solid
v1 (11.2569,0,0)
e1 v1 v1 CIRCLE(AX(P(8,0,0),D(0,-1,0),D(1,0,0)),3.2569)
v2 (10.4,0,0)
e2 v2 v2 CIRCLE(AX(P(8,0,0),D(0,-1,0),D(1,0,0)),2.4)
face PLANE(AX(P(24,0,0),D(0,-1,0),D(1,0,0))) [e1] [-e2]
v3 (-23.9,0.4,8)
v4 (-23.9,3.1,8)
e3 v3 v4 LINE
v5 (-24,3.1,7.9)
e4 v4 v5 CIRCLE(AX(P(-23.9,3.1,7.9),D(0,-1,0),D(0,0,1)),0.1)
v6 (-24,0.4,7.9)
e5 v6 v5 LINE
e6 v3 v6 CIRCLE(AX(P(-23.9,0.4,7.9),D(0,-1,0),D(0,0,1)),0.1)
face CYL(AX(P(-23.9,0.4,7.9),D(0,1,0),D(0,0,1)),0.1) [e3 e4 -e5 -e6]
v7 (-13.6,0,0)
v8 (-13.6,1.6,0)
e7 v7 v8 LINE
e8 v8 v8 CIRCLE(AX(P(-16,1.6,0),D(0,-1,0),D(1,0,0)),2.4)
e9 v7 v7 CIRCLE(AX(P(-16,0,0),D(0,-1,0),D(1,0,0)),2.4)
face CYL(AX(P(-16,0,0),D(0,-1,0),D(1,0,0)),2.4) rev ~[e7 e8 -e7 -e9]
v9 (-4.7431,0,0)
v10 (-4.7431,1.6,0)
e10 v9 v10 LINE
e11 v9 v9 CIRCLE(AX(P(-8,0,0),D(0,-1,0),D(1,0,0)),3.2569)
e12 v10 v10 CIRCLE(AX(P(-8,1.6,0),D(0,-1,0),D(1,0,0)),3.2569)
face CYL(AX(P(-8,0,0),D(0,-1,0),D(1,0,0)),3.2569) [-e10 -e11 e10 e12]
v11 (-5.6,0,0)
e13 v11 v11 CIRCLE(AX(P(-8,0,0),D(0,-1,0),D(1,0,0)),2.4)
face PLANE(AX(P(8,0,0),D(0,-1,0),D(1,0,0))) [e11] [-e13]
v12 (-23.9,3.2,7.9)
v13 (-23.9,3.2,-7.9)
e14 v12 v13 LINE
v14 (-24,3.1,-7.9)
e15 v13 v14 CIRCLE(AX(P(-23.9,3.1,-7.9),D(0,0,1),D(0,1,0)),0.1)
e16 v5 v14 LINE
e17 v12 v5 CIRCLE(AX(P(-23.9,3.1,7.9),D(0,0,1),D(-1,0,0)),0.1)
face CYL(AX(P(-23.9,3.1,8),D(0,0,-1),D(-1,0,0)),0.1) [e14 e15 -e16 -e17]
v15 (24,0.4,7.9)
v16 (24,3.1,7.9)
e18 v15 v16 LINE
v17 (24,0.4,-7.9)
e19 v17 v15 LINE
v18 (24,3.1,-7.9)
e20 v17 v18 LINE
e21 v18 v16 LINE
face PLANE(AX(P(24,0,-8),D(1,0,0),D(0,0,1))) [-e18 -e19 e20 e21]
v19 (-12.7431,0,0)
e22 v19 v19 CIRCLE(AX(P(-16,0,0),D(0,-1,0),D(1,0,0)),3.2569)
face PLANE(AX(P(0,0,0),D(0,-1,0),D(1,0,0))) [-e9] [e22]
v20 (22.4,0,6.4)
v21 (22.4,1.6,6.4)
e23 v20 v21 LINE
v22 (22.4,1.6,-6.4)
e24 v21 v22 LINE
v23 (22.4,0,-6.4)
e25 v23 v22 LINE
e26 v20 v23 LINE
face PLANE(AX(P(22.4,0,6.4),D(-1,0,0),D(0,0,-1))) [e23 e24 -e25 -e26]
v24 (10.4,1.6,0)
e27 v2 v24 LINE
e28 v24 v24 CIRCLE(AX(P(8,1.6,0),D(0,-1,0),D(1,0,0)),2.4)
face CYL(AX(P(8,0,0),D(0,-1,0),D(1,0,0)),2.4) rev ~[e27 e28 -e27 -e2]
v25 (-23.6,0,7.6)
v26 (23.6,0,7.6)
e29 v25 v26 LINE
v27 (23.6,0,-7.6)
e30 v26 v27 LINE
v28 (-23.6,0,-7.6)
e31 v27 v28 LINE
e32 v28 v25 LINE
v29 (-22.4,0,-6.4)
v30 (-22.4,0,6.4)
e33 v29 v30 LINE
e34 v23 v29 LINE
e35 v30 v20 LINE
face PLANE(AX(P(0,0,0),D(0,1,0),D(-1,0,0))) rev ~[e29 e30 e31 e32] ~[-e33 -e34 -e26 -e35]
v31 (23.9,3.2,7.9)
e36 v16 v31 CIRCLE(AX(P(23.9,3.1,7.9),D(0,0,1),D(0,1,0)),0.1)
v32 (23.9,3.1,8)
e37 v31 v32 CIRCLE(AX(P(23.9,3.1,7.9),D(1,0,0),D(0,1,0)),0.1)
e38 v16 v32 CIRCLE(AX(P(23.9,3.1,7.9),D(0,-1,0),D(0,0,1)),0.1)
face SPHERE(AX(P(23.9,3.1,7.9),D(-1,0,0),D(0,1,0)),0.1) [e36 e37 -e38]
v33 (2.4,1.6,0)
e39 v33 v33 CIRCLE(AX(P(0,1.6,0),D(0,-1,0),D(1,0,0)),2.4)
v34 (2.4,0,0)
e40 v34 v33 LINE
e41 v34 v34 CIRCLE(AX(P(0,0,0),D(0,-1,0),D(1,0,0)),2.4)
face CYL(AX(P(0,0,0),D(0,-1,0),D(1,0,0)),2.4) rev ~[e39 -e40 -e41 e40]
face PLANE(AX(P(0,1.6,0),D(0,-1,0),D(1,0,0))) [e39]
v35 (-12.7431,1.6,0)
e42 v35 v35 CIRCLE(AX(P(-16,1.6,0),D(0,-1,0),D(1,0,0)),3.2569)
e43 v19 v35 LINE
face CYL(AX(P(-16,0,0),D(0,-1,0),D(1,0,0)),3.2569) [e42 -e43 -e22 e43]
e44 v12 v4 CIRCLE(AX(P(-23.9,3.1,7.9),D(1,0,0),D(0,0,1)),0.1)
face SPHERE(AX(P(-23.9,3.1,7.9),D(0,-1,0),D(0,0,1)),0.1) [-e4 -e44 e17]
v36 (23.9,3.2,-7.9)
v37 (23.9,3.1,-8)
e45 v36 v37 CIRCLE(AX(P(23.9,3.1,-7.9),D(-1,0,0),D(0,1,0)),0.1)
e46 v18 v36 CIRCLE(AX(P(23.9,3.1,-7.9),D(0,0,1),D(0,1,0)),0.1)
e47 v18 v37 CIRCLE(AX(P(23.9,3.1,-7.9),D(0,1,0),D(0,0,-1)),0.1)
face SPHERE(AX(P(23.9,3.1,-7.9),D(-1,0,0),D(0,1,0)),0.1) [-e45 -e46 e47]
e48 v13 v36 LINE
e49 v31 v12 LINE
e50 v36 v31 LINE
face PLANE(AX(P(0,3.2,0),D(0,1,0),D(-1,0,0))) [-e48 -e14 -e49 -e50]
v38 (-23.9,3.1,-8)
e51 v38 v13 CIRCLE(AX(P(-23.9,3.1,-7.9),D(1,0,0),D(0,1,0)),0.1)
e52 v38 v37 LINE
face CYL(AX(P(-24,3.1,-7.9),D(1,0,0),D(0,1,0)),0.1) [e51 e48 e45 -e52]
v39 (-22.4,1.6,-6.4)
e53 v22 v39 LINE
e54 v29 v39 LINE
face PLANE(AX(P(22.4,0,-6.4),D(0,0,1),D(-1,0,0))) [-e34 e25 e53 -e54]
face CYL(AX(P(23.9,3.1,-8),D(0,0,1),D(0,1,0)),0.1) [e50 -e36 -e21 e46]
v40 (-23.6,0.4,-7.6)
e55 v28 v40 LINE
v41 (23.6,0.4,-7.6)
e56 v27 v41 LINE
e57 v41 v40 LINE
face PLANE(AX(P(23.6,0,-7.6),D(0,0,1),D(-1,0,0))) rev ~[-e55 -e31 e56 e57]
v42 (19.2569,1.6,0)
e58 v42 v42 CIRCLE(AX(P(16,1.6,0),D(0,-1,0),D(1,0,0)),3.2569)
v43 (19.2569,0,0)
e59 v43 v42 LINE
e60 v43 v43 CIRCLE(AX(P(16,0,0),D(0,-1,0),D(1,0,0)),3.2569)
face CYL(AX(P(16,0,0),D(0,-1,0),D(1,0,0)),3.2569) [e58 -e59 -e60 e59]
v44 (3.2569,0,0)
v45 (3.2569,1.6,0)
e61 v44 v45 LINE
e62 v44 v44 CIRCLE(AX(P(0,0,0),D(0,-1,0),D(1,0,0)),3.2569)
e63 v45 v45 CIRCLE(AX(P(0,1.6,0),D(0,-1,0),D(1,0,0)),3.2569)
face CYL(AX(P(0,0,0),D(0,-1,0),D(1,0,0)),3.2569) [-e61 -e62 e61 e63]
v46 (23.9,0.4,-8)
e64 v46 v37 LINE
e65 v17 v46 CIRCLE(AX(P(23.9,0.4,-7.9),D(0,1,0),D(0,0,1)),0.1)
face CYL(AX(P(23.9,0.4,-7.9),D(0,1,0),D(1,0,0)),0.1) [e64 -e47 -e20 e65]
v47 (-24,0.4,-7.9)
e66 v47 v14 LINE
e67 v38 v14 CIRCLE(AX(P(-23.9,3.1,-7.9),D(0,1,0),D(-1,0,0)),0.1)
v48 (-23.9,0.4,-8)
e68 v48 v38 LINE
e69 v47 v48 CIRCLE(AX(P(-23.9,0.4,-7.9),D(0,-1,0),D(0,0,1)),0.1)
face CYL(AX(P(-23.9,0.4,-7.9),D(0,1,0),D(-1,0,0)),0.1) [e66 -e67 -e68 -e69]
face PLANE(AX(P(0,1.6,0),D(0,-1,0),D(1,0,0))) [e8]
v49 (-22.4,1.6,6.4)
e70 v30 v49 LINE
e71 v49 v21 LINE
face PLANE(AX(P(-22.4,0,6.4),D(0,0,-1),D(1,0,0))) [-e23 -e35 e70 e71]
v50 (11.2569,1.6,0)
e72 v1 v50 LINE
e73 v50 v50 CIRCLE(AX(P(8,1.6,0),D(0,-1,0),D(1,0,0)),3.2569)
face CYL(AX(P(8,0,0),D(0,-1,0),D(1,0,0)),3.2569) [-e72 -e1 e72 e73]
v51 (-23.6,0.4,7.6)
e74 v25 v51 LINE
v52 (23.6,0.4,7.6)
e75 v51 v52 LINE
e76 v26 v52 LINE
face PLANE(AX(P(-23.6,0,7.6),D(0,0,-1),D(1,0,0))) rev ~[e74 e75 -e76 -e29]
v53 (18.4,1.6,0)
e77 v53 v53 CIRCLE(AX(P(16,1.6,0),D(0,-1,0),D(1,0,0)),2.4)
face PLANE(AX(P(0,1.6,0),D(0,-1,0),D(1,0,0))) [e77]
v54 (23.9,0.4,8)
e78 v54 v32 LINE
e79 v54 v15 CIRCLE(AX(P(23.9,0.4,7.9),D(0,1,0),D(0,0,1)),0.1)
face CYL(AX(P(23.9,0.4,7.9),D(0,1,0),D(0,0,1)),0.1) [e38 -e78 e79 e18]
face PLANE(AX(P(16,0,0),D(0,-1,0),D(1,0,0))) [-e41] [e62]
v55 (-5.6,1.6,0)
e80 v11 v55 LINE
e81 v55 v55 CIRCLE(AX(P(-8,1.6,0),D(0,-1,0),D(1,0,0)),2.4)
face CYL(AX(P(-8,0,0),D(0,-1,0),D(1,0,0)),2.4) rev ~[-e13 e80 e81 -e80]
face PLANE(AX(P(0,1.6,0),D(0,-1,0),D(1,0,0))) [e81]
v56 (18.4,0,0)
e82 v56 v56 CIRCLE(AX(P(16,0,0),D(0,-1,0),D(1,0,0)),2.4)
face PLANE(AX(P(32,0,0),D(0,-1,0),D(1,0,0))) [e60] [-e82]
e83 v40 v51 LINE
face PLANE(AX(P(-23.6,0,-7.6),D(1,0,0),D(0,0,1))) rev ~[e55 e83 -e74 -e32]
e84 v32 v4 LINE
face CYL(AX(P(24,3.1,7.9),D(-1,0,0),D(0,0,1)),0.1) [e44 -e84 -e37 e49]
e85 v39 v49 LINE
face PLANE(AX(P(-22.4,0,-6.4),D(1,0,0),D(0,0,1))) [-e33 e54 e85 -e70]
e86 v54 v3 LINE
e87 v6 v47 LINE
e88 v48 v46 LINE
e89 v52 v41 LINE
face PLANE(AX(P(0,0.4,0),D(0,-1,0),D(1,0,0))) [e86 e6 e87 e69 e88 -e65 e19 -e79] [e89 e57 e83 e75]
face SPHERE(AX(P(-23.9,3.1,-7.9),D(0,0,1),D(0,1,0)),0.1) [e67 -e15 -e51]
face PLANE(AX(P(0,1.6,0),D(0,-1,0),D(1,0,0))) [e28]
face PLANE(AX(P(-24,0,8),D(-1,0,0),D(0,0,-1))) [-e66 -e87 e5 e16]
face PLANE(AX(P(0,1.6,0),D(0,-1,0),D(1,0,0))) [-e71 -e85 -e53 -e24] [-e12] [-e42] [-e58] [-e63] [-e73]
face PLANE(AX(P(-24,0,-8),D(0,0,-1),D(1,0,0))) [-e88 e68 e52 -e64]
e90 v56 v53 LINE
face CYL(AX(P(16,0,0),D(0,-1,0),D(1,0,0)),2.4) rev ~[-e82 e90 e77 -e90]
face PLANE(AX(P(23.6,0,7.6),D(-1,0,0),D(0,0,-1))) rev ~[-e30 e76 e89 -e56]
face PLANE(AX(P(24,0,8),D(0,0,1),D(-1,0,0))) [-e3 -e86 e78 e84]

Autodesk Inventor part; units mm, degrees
ref_plane "YZ Plane" through (0, 0, 0) normal (1, 0, 0) x (0, 1, 0)
ref_plane "XZ Plane" through (0, 0, 0) normal (0, 1, 0) x (-1, 0, 0)
ref_plane "XY Plane" through (0, 0, 0) normal (0, 0, 1) x (1, 0, 0)
sketch "Sketch2" plane through (0, 0, 0) normal (0, 1, 0) x (-1, 0, 0)
  line L0 (-24, 8) -> (24, 8)
  line L1 (24, 8) -> (24, -8)
  line L2 (24, -8) -> (-24, -8)
  line L3 (-24, -8) -> (-24, 8)
  point P0 (0, 0)
  point P1 (0, 8)
  point P2 (-24, 0)
  dimension "d0" = 48
  dimension "d1" = 16
extrude "Extrusion1" add sketch "Sketch2" along normal blind 3.2
sketch "Sketch3" plane through (0, 0, 0) normal (0, -1, 0) x (1, 0, 0)
  line L0 (-24, 8) -> (-24, -8) projected
  line L1 (-22.4, 6.4) -> (22.4, 6.4)
  line L2 (22.4, 6.4) -> (22.4, -6.4)
  line L3 (22.4, -6.4) -> (-22.4, -6.4)
  line L4 (-22.4, -6.4) -> (-22.4, 6.4)
  circle A0 centre (-16, 0) radius 3.2569
  circle A1 centre (-16, 0) radius 2.4
  line L5 (-24, -8) -> (24, -8) projected
  circle A2 centre (0, 0) radius 1.6
  line L6 (24, -8) -> (24, 8) projected
  line L7 (-12, 0) -> (-4, 0) construction
  line L8 (-4, 0) -> (4, 0) construction
  line L9 (4, 0) -> (12, 0) construction
  circle A3 centre (-20, 4) radius 2.4 construction
  circle A4 centre (-20, -4) radius 2.4 construction
  circle A5 centre (20, -4) radius 2.4 construction
  circle A6 centre (20, 4) radius 2.4 construction
  line L10 (24, 8) -> (-24, 8) projected
  line L11 (-23.6, 7.6) -> (23.6, 7.6)
  line L12 (23.6, 7.6) -> (23.6, -7.6)
  line L13 (23.6, -7.6) -> (-23.6, -7.6)
  line L14 (-23.6, -7.6) -> (-23.6, 7.6)
  point P0 (-22.4, 0)
  point P1 (0, 6.4)
  point P2 (0, 0)
  point P3 (0, 7.6)
  point P4 (-23.6, 0)
  dimension "d61" = 4.8
  dimension "d75" = 8
  dimension "d76" = 8
  dimension "d86" = 3.2
  dimension "d92" = 8
  dimension "d98" = 40
  dimension "d99" = 8
  dimension "d102" = 0.4
  dimension "d103" = 0.4
extrude "Extrusion2" cut sketch "Sketch3" against normal blind 1.6 contours L1 L2 L3 L4 | A0 | A1 | A2
extrude "Extrusion7" cut sketch "Sketch3" against normal blind 0.4 contours L10 L6 L5 L0
extrude "Extrusion6" add sketch "Sketch3" against normal up to next contours A0
pattern_linear "Rectangular Pattern3" count 5 spacing 8 along (1, 0, 0) of "Extrusion6"
fillet "Fillet1" radius 0.1 8 edges at (-24, 1.8, 8) (0, 3.2, 8) (-24, 3.2, 0) (0, 3.2, -8) (24, 3.2, 0) (24, 1.8, 8) (24, 1.8, -8) (-24, 1.8, -8)
sketch "Skizze10" plane through (0, 3.2, 0) normal (0, 1, 0) x (1, 0, 0)
  line L0 (-21.913, 4.8) -> (21.913, 4.8) construction
  line L1 (21.913, 4.8) -> (21.913, -4.8) construction
  line L2 (21.913, -4.8) -> (-21.913, -4.8) construction
  line L3 (-21.913, -4.8) -> (-21.913, 4.8) construction
  line L4 (23.9, 8) -> (-23.9, 8) projected
  line L5 (-23.9, -8) -> (23.9, -8) projected
  point P0 (0, 0)
  point P1 (0, 4.8)
  point P2 (0, 8)
  dimension "d107" = 3.2
  dimension "d110" = 3.2
decal "Aufkleber1"
equation "\"d4\" = 0.333333 * lh"
equation "\"d61\" = kd"
equation "\"d75\" = lu"
equation "\"d76\" = d75"
equation "\"d86\" = pd"
equation "\"d92\" = lu"
equation "\"d98\" = 5 * lu"
equation "\"d99\" = d75"
equation "\"d102\" = gw"
equation "\"d103\" = gw"
equation "\"d11\" = 0.333333 * lh - topthk"
equation "\"d104\" = gh"
equation "\"d91\" = lu"
equation "\"d110\" = d107"
equation "\"lh\" = 9.6"
equation "\"kd\" = 4.8"
equation "\"lu\" = 8"
equation "\"pd\" = 3.2"
equation "\"gw\" = 0.4"
equation "\"topthk\" = 1.6"
equation "\"gh\" = 0.4"
properties part number "69729-DkBluishGray" material "ABS Plastic"
